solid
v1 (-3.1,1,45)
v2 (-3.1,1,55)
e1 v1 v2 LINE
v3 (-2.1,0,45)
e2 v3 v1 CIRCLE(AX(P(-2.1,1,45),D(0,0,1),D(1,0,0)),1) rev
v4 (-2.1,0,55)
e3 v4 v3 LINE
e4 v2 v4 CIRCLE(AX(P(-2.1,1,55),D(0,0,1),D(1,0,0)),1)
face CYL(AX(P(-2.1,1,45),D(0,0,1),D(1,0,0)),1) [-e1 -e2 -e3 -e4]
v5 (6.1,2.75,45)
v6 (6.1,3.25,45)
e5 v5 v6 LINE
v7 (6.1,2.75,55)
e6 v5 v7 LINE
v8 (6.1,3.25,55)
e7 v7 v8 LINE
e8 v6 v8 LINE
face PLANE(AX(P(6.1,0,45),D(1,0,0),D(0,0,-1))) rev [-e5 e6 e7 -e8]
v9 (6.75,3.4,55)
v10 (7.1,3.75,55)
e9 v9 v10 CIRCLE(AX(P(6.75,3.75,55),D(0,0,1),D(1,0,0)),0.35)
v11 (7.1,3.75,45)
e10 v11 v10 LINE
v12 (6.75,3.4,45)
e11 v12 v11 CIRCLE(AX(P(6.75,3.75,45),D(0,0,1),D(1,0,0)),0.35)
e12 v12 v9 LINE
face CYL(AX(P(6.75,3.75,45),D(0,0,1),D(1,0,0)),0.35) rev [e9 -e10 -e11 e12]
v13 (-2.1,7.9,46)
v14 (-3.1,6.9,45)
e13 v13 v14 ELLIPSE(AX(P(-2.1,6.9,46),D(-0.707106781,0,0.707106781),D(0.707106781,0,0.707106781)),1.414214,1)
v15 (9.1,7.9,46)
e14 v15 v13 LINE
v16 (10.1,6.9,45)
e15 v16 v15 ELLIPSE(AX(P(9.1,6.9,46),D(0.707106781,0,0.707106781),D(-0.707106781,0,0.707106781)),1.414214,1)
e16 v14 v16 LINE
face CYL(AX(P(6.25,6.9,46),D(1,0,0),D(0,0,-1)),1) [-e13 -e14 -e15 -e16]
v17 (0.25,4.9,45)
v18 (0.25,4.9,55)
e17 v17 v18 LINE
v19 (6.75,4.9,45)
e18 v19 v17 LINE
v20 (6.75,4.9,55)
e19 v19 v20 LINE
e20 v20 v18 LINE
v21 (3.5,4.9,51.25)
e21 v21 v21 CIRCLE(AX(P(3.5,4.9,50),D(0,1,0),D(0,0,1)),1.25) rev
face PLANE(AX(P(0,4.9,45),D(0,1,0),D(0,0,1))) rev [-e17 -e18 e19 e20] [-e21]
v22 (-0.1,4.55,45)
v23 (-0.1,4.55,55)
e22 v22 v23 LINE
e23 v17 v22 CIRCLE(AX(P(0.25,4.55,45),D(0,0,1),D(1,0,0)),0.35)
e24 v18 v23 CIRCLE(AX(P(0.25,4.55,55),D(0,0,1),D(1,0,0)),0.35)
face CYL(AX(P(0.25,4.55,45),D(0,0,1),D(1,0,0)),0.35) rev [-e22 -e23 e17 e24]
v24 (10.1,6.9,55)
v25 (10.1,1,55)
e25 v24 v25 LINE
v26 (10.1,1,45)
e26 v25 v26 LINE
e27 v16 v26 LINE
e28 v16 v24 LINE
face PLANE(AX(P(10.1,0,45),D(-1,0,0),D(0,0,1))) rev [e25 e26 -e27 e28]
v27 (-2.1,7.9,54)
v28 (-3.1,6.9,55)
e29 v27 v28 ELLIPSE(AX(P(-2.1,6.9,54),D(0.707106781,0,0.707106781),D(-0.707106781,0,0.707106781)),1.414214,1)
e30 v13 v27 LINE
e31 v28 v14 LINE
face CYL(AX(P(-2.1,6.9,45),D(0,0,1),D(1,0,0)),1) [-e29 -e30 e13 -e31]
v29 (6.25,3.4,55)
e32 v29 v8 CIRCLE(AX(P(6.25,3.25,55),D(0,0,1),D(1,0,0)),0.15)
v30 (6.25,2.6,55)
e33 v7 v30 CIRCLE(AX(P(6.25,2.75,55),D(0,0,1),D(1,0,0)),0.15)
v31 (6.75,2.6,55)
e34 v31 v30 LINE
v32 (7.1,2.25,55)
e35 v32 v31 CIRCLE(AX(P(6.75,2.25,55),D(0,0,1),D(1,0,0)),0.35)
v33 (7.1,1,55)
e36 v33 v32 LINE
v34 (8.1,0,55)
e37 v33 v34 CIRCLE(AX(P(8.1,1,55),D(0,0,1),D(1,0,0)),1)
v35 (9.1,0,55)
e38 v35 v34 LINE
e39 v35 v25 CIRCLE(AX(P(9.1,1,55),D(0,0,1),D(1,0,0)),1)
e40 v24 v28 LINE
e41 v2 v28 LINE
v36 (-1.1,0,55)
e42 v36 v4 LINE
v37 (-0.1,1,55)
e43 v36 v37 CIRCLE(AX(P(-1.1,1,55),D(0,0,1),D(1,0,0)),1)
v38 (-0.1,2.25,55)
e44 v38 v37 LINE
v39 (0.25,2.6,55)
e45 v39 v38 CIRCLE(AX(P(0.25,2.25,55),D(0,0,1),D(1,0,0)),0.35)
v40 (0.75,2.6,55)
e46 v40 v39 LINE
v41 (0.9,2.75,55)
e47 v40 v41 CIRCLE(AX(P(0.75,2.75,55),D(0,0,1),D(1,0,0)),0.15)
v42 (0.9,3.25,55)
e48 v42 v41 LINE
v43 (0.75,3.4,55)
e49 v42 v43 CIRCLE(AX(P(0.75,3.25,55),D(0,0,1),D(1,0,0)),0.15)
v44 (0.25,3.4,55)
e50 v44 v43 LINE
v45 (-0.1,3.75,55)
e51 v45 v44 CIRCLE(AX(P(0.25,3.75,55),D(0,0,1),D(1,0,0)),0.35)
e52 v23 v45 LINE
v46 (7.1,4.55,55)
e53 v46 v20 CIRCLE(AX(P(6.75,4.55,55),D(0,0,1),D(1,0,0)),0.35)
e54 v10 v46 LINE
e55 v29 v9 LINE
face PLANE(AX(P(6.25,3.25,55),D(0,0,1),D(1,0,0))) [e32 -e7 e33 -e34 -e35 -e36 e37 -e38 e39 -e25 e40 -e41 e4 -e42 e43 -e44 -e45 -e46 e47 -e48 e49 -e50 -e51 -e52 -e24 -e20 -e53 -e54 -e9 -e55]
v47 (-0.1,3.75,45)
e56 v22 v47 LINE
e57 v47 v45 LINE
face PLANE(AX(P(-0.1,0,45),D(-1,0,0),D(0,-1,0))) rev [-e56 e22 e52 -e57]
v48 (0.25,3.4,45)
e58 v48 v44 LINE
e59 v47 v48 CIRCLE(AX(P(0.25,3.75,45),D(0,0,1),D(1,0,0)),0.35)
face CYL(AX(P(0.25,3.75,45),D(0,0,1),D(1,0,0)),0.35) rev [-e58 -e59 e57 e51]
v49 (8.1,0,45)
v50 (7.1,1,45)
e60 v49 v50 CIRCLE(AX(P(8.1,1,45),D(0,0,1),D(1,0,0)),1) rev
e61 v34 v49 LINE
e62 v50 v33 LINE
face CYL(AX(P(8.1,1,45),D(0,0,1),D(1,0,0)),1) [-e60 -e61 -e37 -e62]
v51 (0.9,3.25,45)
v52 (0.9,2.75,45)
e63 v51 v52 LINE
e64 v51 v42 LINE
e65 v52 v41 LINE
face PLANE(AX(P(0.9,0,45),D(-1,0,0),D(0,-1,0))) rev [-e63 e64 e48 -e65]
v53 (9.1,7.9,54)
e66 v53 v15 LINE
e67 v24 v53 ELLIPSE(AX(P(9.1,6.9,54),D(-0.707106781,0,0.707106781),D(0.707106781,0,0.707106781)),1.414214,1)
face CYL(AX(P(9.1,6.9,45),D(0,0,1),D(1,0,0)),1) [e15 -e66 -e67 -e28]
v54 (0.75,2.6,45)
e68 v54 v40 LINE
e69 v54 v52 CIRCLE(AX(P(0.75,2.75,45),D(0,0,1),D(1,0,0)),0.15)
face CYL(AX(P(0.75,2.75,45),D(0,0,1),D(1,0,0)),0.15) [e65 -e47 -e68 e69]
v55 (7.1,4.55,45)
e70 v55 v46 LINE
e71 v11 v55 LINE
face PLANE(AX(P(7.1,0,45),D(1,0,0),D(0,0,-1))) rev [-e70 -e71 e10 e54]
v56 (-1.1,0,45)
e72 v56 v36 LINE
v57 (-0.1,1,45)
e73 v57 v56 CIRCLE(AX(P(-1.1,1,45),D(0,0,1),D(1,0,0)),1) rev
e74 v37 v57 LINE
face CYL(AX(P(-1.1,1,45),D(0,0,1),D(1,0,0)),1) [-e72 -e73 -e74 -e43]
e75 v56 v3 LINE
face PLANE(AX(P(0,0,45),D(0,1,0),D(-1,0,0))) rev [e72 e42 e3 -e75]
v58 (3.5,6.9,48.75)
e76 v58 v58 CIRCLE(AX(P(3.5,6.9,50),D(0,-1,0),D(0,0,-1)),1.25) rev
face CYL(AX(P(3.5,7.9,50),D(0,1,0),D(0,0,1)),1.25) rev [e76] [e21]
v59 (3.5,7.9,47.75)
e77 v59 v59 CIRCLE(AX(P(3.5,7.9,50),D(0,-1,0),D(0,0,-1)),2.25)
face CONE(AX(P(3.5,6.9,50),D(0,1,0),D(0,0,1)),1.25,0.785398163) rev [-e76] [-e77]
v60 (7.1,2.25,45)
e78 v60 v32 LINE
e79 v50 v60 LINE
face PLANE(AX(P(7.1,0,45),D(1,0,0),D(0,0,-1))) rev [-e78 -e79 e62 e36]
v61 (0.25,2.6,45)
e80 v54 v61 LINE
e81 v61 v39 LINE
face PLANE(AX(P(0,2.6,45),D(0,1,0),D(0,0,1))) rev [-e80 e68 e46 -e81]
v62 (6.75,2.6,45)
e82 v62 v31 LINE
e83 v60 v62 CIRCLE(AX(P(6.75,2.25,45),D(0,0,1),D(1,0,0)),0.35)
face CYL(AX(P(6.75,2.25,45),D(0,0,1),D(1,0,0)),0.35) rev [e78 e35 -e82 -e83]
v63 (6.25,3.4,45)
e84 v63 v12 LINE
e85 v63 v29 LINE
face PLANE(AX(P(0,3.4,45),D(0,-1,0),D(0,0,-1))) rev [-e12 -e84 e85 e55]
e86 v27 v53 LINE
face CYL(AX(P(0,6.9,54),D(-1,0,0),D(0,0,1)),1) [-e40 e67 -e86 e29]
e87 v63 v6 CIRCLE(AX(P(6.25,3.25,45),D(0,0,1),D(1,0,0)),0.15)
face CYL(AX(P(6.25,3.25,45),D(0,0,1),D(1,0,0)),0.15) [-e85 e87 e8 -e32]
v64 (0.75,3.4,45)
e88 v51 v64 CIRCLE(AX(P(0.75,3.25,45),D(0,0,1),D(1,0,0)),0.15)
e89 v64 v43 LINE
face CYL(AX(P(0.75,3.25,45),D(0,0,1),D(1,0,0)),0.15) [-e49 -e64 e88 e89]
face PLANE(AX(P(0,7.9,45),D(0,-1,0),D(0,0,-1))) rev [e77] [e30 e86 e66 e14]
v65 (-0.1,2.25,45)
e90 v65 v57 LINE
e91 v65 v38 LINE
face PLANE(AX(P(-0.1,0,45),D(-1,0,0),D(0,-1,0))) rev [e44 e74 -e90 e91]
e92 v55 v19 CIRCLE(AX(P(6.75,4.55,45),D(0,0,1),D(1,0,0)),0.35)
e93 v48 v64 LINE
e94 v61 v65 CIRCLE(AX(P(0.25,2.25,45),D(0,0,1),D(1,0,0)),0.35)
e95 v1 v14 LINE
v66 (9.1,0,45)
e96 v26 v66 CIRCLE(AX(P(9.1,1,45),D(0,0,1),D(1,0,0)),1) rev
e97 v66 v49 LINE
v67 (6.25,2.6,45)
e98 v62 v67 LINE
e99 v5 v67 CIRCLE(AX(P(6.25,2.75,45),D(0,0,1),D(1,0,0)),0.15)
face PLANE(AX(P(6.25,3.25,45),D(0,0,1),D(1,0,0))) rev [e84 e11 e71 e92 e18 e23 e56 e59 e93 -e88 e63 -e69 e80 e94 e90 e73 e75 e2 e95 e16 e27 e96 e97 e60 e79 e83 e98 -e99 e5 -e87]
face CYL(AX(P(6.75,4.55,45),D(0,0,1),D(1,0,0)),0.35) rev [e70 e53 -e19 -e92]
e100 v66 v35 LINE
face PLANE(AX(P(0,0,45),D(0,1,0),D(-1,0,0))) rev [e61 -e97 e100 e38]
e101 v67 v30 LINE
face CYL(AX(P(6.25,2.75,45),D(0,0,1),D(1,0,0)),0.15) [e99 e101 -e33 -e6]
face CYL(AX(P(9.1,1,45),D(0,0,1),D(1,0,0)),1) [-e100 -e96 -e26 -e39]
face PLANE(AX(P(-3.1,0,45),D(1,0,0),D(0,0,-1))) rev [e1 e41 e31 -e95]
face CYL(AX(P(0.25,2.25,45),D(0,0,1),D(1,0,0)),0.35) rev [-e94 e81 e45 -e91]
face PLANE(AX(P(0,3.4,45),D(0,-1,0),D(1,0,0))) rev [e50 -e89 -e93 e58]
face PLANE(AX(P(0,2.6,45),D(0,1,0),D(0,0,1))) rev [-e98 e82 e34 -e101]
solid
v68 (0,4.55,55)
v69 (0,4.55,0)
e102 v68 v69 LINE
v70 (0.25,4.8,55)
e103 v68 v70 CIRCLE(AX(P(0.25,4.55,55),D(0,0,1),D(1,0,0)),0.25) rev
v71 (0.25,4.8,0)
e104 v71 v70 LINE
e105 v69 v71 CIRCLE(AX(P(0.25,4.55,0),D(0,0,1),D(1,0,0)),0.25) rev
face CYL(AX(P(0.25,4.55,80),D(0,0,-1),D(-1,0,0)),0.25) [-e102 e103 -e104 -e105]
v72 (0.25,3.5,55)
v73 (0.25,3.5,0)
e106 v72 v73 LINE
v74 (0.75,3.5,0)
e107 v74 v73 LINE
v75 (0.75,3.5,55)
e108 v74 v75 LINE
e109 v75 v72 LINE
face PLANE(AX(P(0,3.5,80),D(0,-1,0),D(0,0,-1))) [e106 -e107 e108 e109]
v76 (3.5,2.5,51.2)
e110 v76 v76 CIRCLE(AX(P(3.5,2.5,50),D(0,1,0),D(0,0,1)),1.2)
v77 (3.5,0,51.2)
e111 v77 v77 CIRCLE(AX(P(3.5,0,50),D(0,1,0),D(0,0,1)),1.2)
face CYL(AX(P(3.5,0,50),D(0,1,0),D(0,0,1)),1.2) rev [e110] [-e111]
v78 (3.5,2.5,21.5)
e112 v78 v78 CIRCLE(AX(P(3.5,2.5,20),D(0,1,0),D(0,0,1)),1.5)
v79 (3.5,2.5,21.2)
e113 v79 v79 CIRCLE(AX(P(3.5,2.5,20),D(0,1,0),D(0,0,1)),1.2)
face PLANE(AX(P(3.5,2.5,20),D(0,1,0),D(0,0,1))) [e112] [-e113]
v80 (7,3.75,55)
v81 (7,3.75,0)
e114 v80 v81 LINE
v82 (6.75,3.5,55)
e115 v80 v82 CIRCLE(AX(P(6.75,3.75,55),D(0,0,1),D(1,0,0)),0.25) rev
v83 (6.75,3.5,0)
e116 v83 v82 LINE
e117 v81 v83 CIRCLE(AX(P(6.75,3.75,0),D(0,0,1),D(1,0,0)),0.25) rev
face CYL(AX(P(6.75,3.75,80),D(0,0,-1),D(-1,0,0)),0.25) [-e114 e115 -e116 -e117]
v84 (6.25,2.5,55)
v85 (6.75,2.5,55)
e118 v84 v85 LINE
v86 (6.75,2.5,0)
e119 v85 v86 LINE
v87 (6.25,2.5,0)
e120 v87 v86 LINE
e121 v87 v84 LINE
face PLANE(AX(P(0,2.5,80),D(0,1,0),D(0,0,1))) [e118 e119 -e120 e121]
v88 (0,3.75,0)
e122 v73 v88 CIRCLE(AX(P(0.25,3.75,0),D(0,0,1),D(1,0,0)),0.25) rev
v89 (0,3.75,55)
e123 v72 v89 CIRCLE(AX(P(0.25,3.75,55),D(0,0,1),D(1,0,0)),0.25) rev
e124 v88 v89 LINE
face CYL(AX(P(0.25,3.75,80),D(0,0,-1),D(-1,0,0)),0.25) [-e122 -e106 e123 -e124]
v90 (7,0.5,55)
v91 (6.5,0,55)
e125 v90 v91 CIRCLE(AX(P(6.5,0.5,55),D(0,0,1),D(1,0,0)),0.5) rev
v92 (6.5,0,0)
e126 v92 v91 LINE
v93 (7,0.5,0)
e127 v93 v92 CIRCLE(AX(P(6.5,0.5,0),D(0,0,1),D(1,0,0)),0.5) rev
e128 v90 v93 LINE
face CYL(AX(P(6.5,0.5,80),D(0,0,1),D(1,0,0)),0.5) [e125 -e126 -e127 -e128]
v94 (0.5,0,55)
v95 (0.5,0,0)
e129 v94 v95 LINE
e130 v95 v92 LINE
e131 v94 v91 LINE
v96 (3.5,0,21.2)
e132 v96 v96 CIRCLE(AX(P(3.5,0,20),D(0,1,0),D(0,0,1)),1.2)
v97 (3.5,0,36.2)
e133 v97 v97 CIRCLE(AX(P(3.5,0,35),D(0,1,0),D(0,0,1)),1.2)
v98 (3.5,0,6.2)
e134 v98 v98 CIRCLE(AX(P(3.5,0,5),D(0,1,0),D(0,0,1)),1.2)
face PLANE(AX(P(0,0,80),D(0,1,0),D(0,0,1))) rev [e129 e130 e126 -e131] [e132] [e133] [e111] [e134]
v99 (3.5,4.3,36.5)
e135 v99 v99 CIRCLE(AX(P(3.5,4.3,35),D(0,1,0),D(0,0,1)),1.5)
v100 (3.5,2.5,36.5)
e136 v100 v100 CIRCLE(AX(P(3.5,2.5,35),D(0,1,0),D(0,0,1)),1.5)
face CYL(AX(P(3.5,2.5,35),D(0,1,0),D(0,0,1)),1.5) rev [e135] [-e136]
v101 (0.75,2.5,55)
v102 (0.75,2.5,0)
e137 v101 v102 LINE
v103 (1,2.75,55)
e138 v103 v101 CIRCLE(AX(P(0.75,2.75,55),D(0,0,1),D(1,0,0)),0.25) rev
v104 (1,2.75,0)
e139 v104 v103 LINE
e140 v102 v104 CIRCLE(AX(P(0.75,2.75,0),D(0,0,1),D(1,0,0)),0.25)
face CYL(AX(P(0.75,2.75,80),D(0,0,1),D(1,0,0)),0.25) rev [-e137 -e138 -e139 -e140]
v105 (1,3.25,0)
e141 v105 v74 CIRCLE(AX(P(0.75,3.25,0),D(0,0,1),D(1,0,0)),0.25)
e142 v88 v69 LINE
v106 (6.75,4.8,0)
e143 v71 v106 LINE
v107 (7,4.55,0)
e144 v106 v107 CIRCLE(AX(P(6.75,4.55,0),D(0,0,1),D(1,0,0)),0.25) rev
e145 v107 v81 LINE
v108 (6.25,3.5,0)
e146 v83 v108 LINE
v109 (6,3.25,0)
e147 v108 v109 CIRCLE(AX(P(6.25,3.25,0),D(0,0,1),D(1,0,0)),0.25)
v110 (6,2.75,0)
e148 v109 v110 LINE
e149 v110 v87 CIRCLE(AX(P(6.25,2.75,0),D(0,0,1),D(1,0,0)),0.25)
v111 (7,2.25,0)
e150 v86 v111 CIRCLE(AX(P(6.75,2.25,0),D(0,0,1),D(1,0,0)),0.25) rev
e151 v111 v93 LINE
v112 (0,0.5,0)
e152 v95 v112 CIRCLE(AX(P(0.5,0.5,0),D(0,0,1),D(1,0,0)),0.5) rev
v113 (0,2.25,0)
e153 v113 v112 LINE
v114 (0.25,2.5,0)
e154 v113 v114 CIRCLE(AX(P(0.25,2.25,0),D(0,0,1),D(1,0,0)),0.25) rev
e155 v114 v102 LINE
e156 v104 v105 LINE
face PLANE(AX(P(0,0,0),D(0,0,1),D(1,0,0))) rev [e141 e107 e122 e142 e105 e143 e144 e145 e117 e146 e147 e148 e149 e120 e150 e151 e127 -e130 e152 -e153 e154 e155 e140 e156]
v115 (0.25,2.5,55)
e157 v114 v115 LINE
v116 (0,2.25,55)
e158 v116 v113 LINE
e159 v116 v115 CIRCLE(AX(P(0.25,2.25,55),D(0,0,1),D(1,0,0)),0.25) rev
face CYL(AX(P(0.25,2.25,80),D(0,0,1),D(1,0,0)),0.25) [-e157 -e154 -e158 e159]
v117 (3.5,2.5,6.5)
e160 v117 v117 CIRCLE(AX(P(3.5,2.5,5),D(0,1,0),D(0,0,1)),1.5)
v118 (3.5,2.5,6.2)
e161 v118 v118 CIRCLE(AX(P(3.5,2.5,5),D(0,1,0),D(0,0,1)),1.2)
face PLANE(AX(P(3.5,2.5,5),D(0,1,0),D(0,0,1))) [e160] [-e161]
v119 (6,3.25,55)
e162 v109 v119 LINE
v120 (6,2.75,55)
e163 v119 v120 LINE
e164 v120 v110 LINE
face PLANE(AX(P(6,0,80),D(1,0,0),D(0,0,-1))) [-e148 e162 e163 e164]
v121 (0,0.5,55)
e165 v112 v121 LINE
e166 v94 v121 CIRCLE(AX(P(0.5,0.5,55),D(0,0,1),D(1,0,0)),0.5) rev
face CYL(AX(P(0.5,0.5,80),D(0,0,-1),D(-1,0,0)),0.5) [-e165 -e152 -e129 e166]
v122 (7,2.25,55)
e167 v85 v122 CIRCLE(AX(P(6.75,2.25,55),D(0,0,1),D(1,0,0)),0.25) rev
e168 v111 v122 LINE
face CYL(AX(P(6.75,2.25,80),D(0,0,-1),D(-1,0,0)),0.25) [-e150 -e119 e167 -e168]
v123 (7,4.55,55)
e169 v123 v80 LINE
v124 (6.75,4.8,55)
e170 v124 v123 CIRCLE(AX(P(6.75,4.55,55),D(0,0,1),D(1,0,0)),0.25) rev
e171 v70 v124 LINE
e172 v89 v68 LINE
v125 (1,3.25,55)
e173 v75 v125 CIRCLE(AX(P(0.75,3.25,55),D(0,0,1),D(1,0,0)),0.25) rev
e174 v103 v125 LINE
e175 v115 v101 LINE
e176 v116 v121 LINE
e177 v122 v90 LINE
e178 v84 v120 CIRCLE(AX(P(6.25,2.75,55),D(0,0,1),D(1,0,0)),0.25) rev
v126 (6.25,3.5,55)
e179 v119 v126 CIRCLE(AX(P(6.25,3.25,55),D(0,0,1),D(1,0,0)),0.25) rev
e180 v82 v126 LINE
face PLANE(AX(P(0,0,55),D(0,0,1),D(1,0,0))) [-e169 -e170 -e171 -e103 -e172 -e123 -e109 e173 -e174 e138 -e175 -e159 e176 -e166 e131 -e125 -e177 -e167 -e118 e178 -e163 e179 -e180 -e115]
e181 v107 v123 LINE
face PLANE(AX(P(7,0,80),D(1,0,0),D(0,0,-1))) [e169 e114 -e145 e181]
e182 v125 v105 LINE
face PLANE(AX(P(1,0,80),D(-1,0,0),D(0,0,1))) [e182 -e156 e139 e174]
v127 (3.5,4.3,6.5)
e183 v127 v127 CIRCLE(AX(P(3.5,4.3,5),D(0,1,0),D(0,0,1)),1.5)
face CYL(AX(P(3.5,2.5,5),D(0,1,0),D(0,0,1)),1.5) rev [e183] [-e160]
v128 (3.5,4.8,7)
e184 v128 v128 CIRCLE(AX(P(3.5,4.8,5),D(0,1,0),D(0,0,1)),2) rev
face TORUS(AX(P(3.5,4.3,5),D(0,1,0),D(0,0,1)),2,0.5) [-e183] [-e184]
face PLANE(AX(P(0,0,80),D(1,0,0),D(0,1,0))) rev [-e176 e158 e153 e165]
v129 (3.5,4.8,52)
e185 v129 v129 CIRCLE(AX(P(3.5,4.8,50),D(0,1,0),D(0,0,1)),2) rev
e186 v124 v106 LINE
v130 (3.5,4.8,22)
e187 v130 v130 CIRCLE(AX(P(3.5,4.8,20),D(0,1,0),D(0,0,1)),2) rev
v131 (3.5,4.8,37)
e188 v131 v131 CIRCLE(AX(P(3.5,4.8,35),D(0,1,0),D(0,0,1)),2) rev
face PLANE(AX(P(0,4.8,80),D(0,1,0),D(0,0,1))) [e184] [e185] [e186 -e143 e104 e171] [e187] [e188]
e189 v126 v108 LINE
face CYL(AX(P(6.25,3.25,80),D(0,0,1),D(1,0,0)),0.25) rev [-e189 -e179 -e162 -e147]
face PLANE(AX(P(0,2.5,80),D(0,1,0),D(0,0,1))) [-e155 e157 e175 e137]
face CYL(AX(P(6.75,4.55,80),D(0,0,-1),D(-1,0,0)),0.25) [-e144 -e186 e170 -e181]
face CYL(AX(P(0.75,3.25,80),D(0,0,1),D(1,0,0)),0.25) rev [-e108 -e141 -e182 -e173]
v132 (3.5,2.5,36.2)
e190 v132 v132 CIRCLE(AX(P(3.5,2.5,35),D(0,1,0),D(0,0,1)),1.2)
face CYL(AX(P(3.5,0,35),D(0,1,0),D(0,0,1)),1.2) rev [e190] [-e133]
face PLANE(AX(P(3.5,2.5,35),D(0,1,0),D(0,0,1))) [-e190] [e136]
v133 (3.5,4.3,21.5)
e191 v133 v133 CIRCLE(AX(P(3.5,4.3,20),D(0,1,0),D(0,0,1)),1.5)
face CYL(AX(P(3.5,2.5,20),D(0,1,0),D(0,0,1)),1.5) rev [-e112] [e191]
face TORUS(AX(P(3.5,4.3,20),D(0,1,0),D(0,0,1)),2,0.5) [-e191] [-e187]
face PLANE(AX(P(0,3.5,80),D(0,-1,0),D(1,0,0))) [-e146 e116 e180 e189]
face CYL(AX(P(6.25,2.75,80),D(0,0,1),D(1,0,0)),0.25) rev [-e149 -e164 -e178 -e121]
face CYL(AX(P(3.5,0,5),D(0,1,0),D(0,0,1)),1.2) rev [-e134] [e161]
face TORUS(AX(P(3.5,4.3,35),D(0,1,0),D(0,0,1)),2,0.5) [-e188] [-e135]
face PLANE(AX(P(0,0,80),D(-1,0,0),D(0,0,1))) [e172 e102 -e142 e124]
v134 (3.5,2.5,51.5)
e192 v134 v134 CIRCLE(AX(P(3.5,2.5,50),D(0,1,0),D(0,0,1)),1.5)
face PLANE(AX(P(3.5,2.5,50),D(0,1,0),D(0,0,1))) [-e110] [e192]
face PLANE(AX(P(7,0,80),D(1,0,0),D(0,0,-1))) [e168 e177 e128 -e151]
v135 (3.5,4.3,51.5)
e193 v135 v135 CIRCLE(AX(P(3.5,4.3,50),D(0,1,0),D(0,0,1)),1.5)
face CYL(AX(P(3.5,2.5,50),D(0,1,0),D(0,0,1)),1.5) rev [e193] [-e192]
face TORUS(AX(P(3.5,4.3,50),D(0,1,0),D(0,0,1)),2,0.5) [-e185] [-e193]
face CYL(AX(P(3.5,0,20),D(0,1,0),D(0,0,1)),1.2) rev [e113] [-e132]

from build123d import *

# Parameters (mm, degrees)
EXTRUDE_1_DEPTH                = 80
FILLET_1_R                     = 0.25
FILLET_2_R                     = 0.5
SKETCH_2_R                     = 1.5
CUT_EXTRUDE_1_DEPTH            = 2.3
SKETCH_3_R                     = 1.2
CUT_EXTRUDE_2_DEPTH            = 81.344570445
FILLET_3_R                     = 0.5
PATTERN_LINEAR_2_COUNT         = 6
PATTERN_LINEAR_2_PITCH         = 15
FILLET_3_OF_PATTERN_LINEAR_2_R = 0.5
SKETCH_4_W                     = 7.607362056
SKETCH_4_H                     = 5.534224128
CUT_EXTRUDE_3_DEPTH            = 25
EXTRUDE_START                  = -55
EXTRUDE_2_DEPTH                = 10
FILLET_4_R                     = 1
MM_START                       = 4.9
MM_1_OUTLINE_R                 = 1.25
MM_1_DEPTH                     = 3
CHAMFER_1_SIZE                 = 1


# Read off the part's stored shape, not the designer's step: 大小mm 暗销孔1
with BuildPart() as part:
    # 草图1 → 凸台-拉伸1 (new body)
    with BuildSketch(Plane.XY):
        Polygon((7, 2.5), (7, 0), (0, 0), (0, 2.5), (1, 2.5), (1, 3.5), (0, 3.5), (0, 4.8), (7, 4.8), (7, 3.5), (6, 3.5), (6, 2.5), align=None)
    extrude(amount=EXTRUDE_1_DEPTH)

    # 圆角1
    fillet_1_edges = [part.edges().sort_by_distance(p)[0] for p in [
        (0, 2.5, 40),
        (1, 2.5, 40),
        (1, 3.5, 40),
        (0, 3.5, 40),
        (0, 4.8, 40),
        (7, 4.8, 40),
        (7, 3.5, 40),
        (6, 3.5, 40),
        (6, 2.5, 40),
        (7, 2.5, 40),
    ]]
    fillet(fillet_1_edges, radius=FILLET_1_R)

    # 圆角2
    fillet_2_edges = [part.edges().sort_by_distance(p)[0] for p in [
        (7, 0, 40),
        (0, 0, 40),
    ]]
    fillet(fillet_2_edges, radius=FILLET_2_R)

    # 草图2 → 切除-拉伸1 (cut)
    with BuildSketch(Plane(origin=(0, 4.8, 0), x_dir=(1, 0, 0), z_dir=(0, 1, 0))):
        with Locations(Location((3.5, -5, 0), (0, 0, 270))):
            Circle(SKETCH_2_R)
    cut_extrude_1 = extrude(amount=-CUT_EXTRUDE_1_DEPTH, mode=Mode.SUBTRACT)

    # 草图3 → 切除-拉伸2 (cut, through all)
    with BuildSketch(Plane(origin=(0, 2.5, 0), x_dir=(1, 0, 0), z_dir=(0, 1, 0))):
        with Locations(Location((3.5, -5, 0), (0, 0, 270))):
            Circle(SKETCH_3_R)
    cut_extrude_2 = extrude(amount=-CUT_EXTRUDE_2_DEPTH, mode=Mode.SUBTRACT)

    # 圆角3
    fillet_3_edges = [part.edges().sort_by_distance(p)[0] for p in [
        (3.5, 4.8, 3.5),
    ]]
    fillet(fillet_3_edges, radius=FILLET_3_R)

    # 阵列(线性)2: 切除-拉伸1, 切除-拉伸2 ×6
    with Locations(*[(0, 0, i * PATTERN_LINEAR_2_PITCH) for i in range(1, PATTERN_LINEAR_2_COUNT)]):
        add(cut_extrude_1, mode=Mode.SUBTRACT)
        add(cut_extrude_2, mode=Mode.SUBTRACT)

    # 圆角3 of 阵列(线性)2
    fillet_3_of_pattern_linear_2_edges = [part.edges().sort_by_distance(p)[0] for p in [
        (3.5, 4.8, 18.5),
        (3.5, 4.8, 33.5),
        (3.5, 4.8, 48.5),
        (3.5, 4.8, 63.5),
        (3.5, 4.8, 78.5),
    ]]
    fillet(fillet_3_of_pattern_linear_2_edges, radius=FILLET_3_OF_PATTERN_LINEAR_2_R)

    # 草图4 → 切除-拉伸3 (cut)
    with BuildSketch(Plane.XY.offset(80)):
        with Locations((3.651776821, 2.327683724)):
            Rectangle(SKETCH_4_W, SKETCH_4_H)
    extrude(amount=-CUT_EXTRUDE_3_DEPTH, mode=Mode.SUBTRACT)


with BuildPart() as body_2:
    # 草图5 → 凸台-拉伸2 (new body)
    with BuildSketch(Plane(origin=(0, 0, 0), x_dir=(-1, 0, 0), z_dir=(0, 0, -1)).offset(EXTRUDE_START)):
        with BuildLine():
            ThreePointArc((0.1, 4.55), (-0.002512627, 4.797487373), (-0.25, 4.9))
            Line((-0.25, 4.9), (-6.75, 4.9))
            ThreePointArc((-6.75, 4.9), (-6.997487373, 4.797487373), (-7.1, 4.55))
            Line((-7.1, 4.55), (-7.1, 3.75))
            ThreePointArc((-7.1, 3.75), (-6.997487373, 3.502512627), (-6.75, 3.4))
            Line((-6.75, 3.4), (-6.25, 3.4))
            ThreePointArc((-6.25, 3.4), (-6.143933983, 3.356066017), (-6.1, 3.25))
            Line((-6.1, 3.25), (-6.1, 2.75))
            ThreePointArc((-6.1, 2.75), (-6.143933983, 2.643933983), (-6.25, 2.6))
            Line((-6.25, 2.6), (-6.75, 2.6))
            ThreePointArc((-6.75, 2.6), (-6.997487373, 2.497487373), (-7.1, 2.25))
            Line((-7.1, 2.25), (-7.1, 0))
            Line((-7.1, 0), (-10.1, 0))
            Line((-10.1, 0), (-10.1, 7.9))
            Line((-10.1, 7.9), (3.1, 7.9))
            Line((3.1, 7.9), (3.1, 0))
            Line((3.1, 0), (0.1, 0))
            Line((0.1, 0), (0.1, 2.25))
            ThreePointArc((0.1, 2.25), (-0.002512627, 2.497487373), (-0.25, 2.6))
            Line((-0.25, 2.6), (-0.75, 2.6))
            ThreePointArc((-0.75, 2.6), (-0.856066017, 2.643933983), (-0.9, 2.75))
            Line((-0.9, 2.75), (-0.9, 3.25))
            ThreePointArc((-0.9, 3.25), (-0.856066017, 3.356066017), (-0.75, 3.4))
            Line((-0.75, 3.4), (-0.25, 3.4))
            ThreePointArc((-0.25, 3.4), (-0.002512627, 3.502512627), (0.1, 3.75))
            Line((0.1, 3.75), (0.1, 4.55))
        make_face()
    extrude(amount=EXTRUDE_2_DEPTH)

    # 圆角4
    fillet_4_edges = [body_2.edges().sort_by_distance(p)[0] for p in [
        (3.5, 7.9, 55),
        (3.5, 7.9, 45),
        (-0.1, 0, 50),
        (-3.1, 0, 50),
        (-3.1, 7.9, 50),
        (10.1, 7.9, 50),
        (10.1, 0, 50),
        (7.1, 0, 50),
    ]]
    fillet(fillet_4_edges, radius=FILLET_4_R)

    # 大小mm 暗销孔1 outline → 大小mm 暗销孔1 (cut)
    with BuildSketch(Plane(origin=(0, 0, 0), x_dir=(1, 0, 0), z_dir=(0, 1, 0)).offset(MM_START)):
        with Locations((3.5, -50)):
            Circle(MM_1_OUTLINE_R)
    extrude(amount=MM_1_DEPTH, mode=Mode.SUBTRACT)

    # 倒角1
    chamfer_1_edges = [body_2.edges().sort_by_distance(p)[0] for p in [
        (2.25, 7.9, 50),
    ]]
    chamfer(chamfer_1_edges, length=CHAMFER_1_SIZE)


solid = Compound([part.part, body_2.part])
